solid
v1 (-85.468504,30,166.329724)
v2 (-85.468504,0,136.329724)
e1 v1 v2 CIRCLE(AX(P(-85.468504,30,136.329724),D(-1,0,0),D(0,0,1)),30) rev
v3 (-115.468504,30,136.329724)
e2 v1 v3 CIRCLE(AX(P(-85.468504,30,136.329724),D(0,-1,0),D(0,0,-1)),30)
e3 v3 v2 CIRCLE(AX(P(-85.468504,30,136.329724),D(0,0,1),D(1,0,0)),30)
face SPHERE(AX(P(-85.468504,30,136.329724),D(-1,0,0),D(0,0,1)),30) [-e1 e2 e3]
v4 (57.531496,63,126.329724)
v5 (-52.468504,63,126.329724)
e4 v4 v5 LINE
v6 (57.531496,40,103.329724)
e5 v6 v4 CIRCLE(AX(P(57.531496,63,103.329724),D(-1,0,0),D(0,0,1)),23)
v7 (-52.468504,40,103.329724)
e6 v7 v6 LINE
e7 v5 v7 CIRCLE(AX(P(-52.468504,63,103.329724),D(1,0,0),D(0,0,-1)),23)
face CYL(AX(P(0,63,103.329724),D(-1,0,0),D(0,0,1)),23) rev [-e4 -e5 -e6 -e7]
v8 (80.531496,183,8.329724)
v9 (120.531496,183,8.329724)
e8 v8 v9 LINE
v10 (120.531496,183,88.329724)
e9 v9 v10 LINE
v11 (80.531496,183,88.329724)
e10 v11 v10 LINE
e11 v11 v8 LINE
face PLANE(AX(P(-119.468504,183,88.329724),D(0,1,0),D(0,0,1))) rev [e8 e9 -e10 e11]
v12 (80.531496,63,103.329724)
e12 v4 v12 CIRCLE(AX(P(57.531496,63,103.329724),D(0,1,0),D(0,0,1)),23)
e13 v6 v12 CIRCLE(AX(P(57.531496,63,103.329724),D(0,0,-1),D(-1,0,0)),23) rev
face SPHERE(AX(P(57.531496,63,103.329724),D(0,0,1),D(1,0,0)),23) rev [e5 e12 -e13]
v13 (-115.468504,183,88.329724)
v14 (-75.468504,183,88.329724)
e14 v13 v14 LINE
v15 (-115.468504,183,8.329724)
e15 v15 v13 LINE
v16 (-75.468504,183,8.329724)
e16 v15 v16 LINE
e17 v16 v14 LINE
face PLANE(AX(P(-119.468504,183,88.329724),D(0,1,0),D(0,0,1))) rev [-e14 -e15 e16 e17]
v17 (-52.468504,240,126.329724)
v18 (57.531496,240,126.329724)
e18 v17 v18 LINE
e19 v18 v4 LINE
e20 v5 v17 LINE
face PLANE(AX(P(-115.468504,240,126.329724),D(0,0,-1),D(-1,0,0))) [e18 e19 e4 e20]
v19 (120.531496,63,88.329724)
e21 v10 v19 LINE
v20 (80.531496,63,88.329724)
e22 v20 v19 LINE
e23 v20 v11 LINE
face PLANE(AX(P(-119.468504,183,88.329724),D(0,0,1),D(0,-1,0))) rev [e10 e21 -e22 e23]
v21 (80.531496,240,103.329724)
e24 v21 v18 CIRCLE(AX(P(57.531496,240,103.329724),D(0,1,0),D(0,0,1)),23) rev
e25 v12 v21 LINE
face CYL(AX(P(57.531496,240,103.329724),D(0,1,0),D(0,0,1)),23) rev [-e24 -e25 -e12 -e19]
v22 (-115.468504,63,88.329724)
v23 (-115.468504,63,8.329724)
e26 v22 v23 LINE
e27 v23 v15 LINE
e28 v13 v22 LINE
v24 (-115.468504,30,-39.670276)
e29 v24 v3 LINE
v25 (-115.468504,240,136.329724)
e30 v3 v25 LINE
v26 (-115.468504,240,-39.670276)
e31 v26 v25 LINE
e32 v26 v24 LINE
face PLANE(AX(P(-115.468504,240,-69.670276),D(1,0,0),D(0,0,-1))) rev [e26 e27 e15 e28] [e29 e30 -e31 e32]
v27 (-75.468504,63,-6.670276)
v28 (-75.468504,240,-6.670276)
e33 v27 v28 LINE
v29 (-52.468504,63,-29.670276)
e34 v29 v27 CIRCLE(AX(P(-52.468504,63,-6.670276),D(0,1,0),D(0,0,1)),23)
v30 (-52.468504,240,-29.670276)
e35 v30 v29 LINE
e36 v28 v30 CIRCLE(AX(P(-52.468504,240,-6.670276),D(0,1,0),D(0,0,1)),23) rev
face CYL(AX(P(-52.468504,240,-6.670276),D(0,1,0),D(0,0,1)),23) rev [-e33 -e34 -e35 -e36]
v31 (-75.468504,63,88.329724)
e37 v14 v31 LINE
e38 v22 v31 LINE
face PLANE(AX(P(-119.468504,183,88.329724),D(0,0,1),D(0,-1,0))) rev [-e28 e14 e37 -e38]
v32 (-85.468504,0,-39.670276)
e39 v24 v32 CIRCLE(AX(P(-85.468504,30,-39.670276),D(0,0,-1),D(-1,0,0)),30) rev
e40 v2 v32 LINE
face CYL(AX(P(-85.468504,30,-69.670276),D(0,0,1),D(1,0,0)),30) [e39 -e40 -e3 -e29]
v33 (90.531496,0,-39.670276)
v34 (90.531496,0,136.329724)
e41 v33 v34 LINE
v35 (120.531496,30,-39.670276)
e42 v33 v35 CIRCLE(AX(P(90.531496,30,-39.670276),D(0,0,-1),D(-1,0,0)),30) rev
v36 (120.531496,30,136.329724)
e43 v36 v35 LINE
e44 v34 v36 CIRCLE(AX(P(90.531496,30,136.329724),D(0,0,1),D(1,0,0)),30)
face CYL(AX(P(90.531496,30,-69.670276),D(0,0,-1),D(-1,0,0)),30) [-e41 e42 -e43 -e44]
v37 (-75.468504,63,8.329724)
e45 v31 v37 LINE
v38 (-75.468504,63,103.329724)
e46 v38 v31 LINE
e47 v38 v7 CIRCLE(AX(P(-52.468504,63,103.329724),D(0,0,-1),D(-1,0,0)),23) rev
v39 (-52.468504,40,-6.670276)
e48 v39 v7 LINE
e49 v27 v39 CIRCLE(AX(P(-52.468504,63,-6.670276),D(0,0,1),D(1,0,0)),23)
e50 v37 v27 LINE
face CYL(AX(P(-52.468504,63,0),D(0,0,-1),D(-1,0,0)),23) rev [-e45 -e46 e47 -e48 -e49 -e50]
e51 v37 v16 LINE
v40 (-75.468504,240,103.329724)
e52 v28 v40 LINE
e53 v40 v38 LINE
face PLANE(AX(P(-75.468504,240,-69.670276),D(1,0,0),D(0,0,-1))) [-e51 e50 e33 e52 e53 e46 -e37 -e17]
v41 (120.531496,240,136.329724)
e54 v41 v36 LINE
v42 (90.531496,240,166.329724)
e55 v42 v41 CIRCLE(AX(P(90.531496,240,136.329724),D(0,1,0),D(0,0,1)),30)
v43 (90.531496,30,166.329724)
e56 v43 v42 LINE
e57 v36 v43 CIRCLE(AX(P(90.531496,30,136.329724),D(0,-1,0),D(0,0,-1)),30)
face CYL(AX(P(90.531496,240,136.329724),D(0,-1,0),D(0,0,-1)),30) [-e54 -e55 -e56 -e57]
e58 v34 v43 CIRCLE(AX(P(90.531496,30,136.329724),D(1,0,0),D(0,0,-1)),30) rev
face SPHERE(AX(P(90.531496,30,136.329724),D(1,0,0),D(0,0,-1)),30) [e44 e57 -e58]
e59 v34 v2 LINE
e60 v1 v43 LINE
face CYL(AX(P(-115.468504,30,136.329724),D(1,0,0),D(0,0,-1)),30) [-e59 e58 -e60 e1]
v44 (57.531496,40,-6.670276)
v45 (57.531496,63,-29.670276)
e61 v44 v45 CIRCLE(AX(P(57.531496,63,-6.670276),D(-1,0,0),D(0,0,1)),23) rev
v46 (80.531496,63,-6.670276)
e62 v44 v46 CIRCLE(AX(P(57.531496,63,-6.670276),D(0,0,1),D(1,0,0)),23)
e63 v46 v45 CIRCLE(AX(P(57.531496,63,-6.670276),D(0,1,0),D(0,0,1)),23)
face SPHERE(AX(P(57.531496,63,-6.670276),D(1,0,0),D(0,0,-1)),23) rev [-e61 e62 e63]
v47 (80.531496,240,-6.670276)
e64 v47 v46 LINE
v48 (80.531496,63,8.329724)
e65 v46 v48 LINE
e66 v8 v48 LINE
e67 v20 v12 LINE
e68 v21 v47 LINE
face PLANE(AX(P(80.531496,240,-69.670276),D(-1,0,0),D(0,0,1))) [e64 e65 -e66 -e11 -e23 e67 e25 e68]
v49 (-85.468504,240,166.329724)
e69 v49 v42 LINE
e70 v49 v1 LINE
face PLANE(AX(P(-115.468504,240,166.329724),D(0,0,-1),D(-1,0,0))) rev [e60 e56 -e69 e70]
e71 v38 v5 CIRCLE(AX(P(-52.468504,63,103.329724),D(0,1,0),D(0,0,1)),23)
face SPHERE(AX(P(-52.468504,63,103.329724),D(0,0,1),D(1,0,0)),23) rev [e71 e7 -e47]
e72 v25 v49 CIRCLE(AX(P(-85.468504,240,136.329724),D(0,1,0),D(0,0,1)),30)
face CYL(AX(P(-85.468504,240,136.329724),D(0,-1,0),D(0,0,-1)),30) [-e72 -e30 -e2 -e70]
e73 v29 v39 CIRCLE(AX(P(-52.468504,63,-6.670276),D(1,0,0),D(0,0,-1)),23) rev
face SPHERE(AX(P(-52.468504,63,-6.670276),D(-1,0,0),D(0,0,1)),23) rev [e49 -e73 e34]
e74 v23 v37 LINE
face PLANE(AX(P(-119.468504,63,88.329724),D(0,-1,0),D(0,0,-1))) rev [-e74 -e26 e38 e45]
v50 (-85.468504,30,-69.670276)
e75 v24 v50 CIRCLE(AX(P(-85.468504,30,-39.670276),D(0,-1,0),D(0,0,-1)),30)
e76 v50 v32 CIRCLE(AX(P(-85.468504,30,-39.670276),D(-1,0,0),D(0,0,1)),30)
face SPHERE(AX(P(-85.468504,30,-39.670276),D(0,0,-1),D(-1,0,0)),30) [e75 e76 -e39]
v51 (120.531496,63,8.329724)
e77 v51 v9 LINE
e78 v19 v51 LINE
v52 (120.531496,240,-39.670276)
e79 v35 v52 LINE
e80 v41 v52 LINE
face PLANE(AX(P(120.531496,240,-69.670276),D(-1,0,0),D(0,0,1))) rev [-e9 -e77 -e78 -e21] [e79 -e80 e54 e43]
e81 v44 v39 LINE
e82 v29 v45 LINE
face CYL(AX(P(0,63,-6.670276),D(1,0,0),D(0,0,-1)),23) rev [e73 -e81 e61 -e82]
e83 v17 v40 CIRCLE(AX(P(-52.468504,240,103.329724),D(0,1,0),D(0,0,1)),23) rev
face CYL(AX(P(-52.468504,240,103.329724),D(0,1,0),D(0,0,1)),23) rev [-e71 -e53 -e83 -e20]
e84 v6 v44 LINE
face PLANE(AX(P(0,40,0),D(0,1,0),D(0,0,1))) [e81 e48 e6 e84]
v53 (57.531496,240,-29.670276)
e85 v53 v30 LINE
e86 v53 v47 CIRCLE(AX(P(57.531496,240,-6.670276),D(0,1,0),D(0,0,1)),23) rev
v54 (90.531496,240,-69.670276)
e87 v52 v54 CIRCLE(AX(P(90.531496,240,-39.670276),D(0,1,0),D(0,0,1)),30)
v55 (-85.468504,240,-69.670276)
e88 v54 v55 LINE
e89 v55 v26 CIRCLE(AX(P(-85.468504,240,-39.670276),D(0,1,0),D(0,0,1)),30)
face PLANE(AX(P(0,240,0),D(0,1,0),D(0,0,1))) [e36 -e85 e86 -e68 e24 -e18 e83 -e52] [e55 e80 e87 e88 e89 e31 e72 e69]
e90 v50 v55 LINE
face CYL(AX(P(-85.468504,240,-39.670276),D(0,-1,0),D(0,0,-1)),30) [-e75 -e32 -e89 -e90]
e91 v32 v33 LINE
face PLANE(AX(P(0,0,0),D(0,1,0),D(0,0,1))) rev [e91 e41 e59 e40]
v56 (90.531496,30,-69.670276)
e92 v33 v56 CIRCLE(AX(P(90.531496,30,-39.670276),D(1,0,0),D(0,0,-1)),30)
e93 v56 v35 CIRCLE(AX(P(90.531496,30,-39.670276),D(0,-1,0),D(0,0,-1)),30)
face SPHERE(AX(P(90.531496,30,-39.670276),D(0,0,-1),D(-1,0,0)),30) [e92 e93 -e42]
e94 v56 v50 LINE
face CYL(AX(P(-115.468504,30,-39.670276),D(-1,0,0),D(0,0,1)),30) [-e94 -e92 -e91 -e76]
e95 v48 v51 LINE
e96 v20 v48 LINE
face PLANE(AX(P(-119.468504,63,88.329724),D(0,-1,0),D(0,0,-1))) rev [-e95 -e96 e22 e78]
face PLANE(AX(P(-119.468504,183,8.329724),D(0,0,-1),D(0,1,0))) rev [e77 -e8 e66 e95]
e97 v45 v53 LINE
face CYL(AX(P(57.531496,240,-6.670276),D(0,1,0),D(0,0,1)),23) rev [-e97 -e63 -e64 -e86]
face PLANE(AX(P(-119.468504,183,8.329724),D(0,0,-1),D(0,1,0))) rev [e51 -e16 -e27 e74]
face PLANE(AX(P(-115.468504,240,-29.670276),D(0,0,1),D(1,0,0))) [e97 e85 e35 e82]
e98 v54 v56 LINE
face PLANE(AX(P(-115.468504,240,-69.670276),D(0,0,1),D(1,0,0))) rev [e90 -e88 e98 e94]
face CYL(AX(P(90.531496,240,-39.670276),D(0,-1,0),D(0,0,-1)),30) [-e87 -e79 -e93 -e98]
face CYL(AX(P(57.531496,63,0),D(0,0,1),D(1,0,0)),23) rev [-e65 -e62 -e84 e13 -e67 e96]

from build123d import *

# Parameters (mm, degrees)
SKETCH1_W           = 236
SKETCH1_H           = 236
BOSS_EXTRUDE1_DEPTH = 240
SHELL1_T            = -40
FILLET1_R           = 23
FILLET2_R           = 30
SKETCH3_W           = 80
SKETCH3_H           = 120
CUT_EXTRUDE2_DEPTH  = 240


with BuildPart() as part:
    # Sketch1 → Boss-Extrude1 (new body)
    with BuildSketch(Plane(origin=(0, 0, 0), x_dir=(1, 0, 0), z_dir=(0, 1, 0))):
        with Locations((2.531496063, -48.329724409)):
            Rectangle(SKETCH1_W, SKETCH1_H)
    extrude(amount=BOSS_EXTRUDE1_DEPTH)

    # Shell1
    shell1_openings = [part.faces().sort_by_distance(p)[0] for p in [
        (2.531496063, 240, 48.329724409),
    ]]
    offset(amount=SHELL1_T, openings=shell1_openings, kind=Kind.INTERSECTION)

    # Fillet1
    fillet1_edges = [part.edges().sort_by_distance(p)[0] for p in [
        (-75.468503937, 40, 48.329724409),
        (-75.468503937, 140, -29.670275591),
        (2.531496063, 40, 126.329724409),
        (-75.468503937, 140, 126.329724409),
        (80.531496063, 40, 48.329724409),
        (80.531496063, 140, 126.329724409),
        (2.531496063, 40, -29.670275591),
        (80.531496063, 140, -29.670275591),
    ]]
    fillet(fillet1_edges, radius=FILLET1_R)

    # Fillet2
    fillet2_edges = [part.edges().sort_by_distance(p)[0] for p in [
        (2.531496063, 0, -69.670275591),
        (120.531496063, 0, 48.329724409),
        (2.531496063, 0, 166.329724409),
        (-115.468503937, 0, 48.329724409),
        (-115.468503937, 120, -69.670275591),
        (120.531496063, 120, -69.670275591),
        (120.531496063, 120, 166.329724409),
        (-115.468503937, 120, 166.329724409),
    ]]
    fillet(fillet2_edges, radius=FILLET2_R)

    # Sketch3 → Cut-Extrude2 (cut)
    with BuildSketch(Plane(origin=(120.531496063, 0, 0), x_dir=(0, 0, -1), z_dir=(1, 0, 0))):
        with Locations((-48.329724409, 123)):
            Rectangle(SKETCH3_W, SKETCH3_H)
    extrude(amount=-CUT_EXTRUDE2_DEPTH, mode=Mode.SUBTRACT)


solid = part.part
